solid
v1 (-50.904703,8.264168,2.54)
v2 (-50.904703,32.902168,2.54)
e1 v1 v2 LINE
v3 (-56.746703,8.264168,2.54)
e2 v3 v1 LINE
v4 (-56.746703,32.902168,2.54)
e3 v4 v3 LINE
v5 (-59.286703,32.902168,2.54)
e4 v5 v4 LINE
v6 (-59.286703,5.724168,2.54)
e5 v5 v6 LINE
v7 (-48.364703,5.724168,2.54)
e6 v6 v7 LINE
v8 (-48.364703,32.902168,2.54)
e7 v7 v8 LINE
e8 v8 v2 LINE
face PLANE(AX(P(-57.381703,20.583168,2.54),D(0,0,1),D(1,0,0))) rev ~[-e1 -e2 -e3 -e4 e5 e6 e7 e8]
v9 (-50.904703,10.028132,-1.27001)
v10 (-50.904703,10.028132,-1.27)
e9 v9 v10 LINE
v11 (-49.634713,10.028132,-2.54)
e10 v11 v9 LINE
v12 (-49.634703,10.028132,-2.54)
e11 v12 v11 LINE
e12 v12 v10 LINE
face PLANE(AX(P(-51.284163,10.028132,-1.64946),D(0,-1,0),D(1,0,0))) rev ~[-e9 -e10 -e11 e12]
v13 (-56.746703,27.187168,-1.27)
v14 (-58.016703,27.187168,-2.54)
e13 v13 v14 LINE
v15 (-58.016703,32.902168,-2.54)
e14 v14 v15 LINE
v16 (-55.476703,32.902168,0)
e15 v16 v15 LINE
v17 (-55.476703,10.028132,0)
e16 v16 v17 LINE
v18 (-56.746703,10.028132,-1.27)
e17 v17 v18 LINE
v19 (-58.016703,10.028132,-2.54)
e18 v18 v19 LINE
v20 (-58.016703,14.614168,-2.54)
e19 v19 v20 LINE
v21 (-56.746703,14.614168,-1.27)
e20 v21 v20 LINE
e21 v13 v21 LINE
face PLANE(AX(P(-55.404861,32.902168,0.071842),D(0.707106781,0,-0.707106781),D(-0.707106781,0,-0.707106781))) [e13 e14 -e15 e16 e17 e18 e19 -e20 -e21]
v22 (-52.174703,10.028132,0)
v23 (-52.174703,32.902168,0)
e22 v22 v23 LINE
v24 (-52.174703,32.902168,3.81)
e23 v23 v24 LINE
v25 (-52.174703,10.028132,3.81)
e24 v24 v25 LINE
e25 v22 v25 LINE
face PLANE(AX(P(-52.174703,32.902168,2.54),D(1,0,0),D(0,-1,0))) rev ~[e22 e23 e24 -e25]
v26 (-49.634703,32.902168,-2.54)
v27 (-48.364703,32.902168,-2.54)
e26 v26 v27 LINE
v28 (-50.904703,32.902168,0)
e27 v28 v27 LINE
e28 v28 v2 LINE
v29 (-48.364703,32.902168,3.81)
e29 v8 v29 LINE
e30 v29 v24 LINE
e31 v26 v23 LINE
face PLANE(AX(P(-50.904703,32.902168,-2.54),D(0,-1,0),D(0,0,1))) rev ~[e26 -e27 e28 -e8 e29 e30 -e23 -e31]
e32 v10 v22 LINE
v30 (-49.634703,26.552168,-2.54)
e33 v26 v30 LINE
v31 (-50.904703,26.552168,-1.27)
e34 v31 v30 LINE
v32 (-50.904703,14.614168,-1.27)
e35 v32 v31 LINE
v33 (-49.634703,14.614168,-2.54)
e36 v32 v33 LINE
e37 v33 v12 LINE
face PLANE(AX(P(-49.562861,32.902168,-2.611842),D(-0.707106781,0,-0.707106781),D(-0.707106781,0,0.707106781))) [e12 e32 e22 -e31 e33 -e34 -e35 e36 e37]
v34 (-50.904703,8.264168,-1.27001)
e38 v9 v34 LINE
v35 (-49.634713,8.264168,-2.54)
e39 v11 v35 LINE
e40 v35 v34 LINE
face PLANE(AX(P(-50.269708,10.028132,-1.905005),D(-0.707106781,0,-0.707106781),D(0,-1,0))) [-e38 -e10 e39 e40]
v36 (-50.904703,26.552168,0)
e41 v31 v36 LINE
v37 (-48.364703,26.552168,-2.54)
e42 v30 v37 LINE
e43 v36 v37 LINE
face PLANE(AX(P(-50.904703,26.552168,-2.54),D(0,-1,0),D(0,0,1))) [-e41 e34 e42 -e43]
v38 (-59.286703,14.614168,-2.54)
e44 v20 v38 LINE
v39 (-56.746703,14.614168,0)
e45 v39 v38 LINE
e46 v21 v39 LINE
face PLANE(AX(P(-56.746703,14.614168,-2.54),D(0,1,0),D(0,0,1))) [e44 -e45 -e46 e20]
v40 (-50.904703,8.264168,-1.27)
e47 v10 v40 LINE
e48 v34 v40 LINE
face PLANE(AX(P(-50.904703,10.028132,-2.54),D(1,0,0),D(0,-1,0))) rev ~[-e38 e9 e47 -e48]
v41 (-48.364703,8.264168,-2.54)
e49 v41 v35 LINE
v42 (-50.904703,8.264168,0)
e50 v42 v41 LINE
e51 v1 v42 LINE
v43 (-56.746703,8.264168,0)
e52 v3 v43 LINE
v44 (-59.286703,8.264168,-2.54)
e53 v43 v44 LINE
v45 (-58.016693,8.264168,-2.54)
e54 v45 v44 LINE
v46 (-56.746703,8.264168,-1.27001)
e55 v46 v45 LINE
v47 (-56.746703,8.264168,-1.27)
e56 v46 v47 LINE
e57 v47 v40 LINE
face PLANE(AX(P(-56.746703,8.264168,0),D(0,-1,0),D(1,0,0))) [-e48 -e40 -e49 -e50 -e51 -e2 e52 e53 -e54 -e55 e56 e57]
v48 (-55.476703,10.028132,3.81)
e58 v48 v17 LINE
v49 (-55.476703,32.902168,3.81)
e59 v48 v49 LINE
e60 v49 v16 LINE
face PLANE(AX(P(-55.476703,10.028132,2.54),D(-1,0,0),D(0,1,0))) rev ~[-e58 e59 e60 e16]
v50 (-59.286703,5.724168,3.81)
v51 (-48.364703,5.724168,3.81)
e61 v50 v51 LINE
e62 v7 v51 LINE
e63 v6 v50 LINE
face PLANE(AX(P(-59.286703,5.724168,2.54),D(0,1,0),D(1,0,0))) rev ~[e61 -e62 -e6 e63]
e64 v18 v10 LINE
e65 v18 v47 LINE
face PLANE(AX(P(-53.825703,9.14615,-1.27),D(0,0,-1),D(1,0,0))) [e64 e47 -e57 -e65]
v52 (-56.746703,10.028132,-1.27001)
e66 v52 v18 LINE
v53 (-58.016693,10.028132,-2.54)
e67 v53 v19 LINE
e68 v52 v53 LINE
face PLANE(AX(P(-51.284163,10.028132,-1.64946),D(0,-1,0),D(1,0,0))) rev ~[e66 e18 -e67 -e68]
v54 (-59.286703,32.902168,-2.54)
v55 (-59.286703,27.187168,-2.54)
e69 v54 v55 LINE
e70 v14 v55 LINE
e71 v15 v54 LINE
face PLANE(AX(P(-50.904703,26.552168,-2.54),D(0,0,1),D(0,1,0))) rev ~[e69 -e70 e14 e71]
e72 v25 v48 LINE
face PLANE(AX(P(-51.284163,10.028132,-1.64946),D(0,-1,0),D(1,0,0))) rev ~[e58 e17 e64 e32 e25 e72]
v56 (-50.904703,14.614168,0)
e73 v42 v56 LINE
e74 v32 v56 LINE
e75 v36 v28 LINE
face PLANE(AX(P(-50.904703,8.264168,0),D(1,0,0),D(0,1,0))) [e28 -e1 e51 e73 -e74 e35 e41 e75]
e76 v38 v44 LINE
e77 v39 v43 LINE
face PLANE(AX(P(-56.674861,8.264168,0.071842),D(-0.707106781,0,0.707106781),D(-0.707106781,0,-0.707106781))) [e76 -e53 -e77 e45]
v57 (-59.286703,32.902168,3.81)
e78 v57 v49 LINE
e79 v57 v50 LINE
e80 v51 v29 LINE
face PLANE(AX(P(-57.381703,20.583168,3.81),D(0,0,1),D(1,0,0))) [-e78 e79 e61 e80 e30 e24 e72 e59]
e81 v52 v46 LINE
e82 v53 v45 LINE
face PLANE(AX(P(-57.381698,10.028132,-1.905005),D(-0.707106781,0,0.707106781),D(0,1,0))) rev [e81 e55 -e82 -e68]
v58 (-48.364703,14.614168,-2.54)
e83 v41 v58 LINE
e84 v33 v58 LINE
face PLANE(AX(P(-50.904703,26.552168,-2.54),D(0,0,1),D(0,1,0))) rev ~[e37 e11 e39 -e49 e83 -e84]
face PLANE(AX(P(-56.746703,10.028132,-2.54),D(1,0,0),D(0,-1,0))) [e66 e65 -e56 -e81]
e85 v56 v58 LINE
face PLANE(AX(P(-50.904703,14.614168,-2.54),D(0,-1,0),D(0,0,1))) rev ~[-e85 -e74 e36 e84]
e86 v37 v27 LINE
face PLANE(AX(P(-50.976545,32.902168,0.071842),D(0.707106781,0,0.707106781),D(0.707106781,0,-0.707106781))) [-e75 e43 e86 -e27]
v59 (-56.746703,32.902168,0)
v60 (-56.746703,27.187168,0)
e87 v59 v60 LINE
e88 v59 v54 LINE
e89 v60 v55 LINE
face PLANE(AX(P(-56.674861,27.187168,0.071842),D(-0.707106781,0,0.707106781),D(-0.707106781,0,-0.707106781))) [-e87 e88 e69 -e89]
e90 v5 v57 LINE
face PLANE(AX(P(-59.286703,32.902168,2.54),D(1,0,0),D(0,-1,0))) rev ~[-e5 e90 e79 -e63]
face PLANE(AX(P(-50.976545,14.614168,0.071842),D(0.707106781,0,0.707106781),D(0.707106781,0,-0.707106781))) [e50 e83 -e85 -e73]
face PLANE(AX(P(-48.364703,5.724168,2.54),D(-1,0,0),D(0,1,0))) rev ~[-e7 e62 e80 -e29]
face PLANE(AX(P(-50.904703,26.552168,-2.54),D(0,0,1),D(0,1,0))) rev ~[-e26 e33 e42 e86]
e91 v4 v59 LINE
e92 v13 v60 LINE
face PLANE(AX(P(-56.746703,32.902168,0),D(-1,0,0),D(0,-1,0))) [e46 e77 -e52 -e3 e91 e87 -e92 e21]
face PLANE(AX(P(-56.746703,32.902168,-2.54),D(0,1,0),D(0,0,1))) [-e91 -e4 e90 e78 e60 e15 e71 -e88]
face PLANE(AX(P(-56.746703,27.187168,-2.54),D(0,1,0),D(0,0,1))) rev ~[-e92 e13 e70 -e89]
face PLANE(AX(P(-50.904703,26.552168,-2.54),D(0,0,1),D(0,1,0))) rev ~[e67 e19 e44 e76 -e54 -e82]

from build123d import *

# Parameters (mm, degrees)
F1_DEPTH      = 2.54
F1_DEPTH_BACK = 2.54
F2_W          = 3.81
F2_H          = 24.638
F2_W_2        = 2.54
F3_DEPTH      = 1.27
F4_W          = 5.715
F4_H          = 2.54
F4_W_2        = 6.35
F6_DEPTH      = 2.54
F5_W          = 6.35
F5_H          = 2.54
F7_DEPTH      = 2.54
F8_T1_DEPTH   = 22.8740361466
F8_T6_DEPTH   = 6.35
F8_T11_DEPTH  = 6.35
F8_T16_DEPTH  = 6.35
F8_T21_DEPTH  = 5.715
F9_W          = 5.842
F9_H          = 1.7639638534
F10_DEPTH     = 1.27
F11_SIZE      = 1.26999


# Not quite as in the source:
# - a fillet or chamfer that OpenCascade refuses, or shapes differently, is made with other operations: its cross-section is extruded or revolved along the edge and cut away or added
# - a fillet or chamfer is up to 0.001 mm smaller than in the source, because OpenCascade refuses the exact size


with BuildPart() as f1:
    # F0 (on Top) → F1 (new body, two sides)
    with BuildSketch(Plane.XY) as f1_sk:
        Polygon((-55.4767026412, 32.9021683285), (-56.7467026412, 32.9021683285), (-56.7467026412, 8.2641683285), (-50.9047026412, 8.2641683285), (-50.9047026412, 32.9021683285), (-52.1747026412, 32.9021683285), (-52.1747026412, 10.0281321819), (-55.4767026412, 10.0281321819), align=None)
    extrude(amount=F1_DEPTH)
    extrude(f1_sk.sketch, amount=-F1_DEPTH_BACK)

    # F2 (on face) → F3 (join)
    with BuildSketch(Plane.XY.offset(2.54)):
        with Locations((-57.3817026412, 20.5831683285)):
            Rectangle(F2_W, F2_H)
        Polygon((-50.9047026412, 8.2641683285), (-55.4767026412, 8.2641683285), (-59.2867026412, 8.2641683285), (-59.2867026412, 5.7241683285), (-48.3647026412, 5.7241683285), (-48.3647026412, 8.2641683285), align=None)
        with Locations((-49.6347026412, 20.5831683285)):
            Rectangle(F2_W_2, F2_H)
        Polygon((-52.1747026412, 10.0281321819), (-55.4767026412, 10.0281321819), (-55.4767026412, 8.2641683285), (-50.9047026412, 8.2641683285), (-50.9047026412, 32.9021683285), (-52.1747026412, 32.9021683285), align=None)
    extrude(amount=F3_DEPTH)

    # F4 (on face) → F6 (join)
    with BuildSketch(Plane(origin=(-56.7467026412, 0, 0), x_dir=(0, -1, 0), z_dir=(-1, 0, 0))):
        with Locations((-30.0446683285, -1.27)):
            Rectangle(F4_W, F4_H)
        with Locations((-11.4391683285, -1.27)):
            Rectangle(F4_W_2, F4_H)
    extrude(amount=F6_DEPTH)

    # F5 (on face) → F7 (join)
    with BuildSketch(Plane.YZ.offset(-50.9047026412)):
        with Locations((29.7271683285, -1.27)):
            Rectangle(F5_W, F5_H)
        with Locations((11.4391683285, -1.27)):
            Rectangle(F5_W, F5_H)
    extrude(amount=F7_DEPTH)

    # F8: chamfer of 2.54 on 6 edges, made by hand

    # F8_s2 → F8_t1 (cut)
    with BuildSketch(Plane.XZ.offset(-32.9021683285)):
        with BuildLine():
            Line((-49.5628605923, -2.611842049), (-52.2465446902, 0.071842049))
            Line((-52.2465446902, 0.071842049), (-52.2973446902, 0.071842049))
            ThreePointArc((-52.2973446902, 0.071842049), (-52.2255026412, -1.2340789755), (-52.2255026412, -2.54))
            Line((-52.2255026412, -2.54), (-52.1747026412, -2.5908))
            ThreePointArc((-52.1747026412, -2.5908), (-50.8687816168, -2.5908), (-49.5628605923, -2.662642049))
            Line((-49.5628605923, -2.662642049), (-49.5628605923, -2.611842049))
        make_face()
        with BuildLine():
            Line((-55.4048605923, 0.071842049), (-58.0885446902, -2.611842049))
            Line((-58.0885446902, -2.611842049), (-58.0885446902, -2.662642049))
            ThreePointArc((-58.0885446902, -2.662642049), (-56.7826236657, -2.5908), (-55.4767026412, -2.5908))
            Line((-55.4767026412, -2.5908), (-55.4259026412, -2.54))
            ThreePointArc((-55.4259026412, -2.54), (-55.4259026412, -1.2340789755), (-55.3540605923, 0.071842049))
            Line((-55.3540605923, 0.071842049), (-55.4048605923, 0.071842049))
        make_face()
    extrude(amount=F8_T1_DEPTH, mode=Mode.SUBTRACT)


with BuildPart() as f8_tool4:
    # F8_s5 → F8_t6 (new body)
    with BuildSketch(Plane.XZ.offset(-32.9021683285)):
        with BuildLine():
            Line((-50.9765446902, 0.071842049), (-48.2928605923, -2.611842049))
            Line((-48.2928605923, -2.611842049), (-48.2420605923, -2.611842049))
            ThreePointArc((-48.2420605923, -2.611842049), (-48.3139026412, -1.3059210245), (-48.3139026412, 0))
            Line((-48.3139026412, 0), (-48.3647026412, 0.0508))
            ThreePointArc((-48.3647026412, 0.0508), (-49.6706236657, 0.0508), (-50.9765446902, 0.122642049))
            Line((-50.9765446902, 0.122642049), (-50.9765446902, 0.071842049))
        make_face()
    extrude(amount=F8_T6_DEPTH)

    split(bisect_by=Plane.YZ.offset(-50.9047026412), keep=Keep.TOP)


with BuildPart() as f1_1:
    add(f1.part)

    # F8_t3: cut F8_tool4
    add(f8_tool4.part, mode=Mode.SUBTRACT)


with BuildPart() as f8_tool9:
    # F8_s10 → F8_t11 (new body)
    with BuildSketch(Plane.XZ.offset(-14.6141683285)):
        with BuildLine():
            Line((-50.9765446902, 0.071842049), (-48.2928605923, -2.611842049))
            Line((-48.2928605923, -2.611842049), (-48.2420605923, -2.611842049))
            ThreePointArc((-48.2420605923, -2.611842049), (-48.3139026412, -1.3059210245), (-48.3139026412, 0))
            Line((-48.3139026412, 0), (-48.3647026412, 0.0508))
            ThreePointArc((-48.3647026412, 0.0508), (-49.6706236657, 0.0508), (-50.9765446902, 0.122642049))
            Line((-50.9765446902, 0.122642049), (-50.9765446902, 0.071842049))
        make_face()
    extrude(amount=F8_T11_DEPTH)

    split(bisect_by=Plane.YZ.offset(-50.9047026412), keep=Keep.TOP)


with BuildPart() as f1_2:
    add(f1_1.part)

    # F8_t8: cut F8_tool9
    add(f8_tool9.part, mode=Mode.SUBTRACT)


with BuildPart() as f8_tool14:
    # F8_s15 → F8_t16 (new body)
    with BuildSketch(Plane.XZ.offset(-8.2641683285)):
        with BuildLine():
            Line((-56.6748605923, 0.071842049), (-59.3585446902, -2.611842049))
            Line((-59.3585446902, -2.611842049), (-59.4093446902, -2.611842049))
            ThreePointArc((-59.4093446902, -2.611842049), (-59.3375026412, -1.3059210245), (-59.3375026412, 0))
            Line((-59.3375026412, 0), (-59.2867026412, 0.0508))
            ThreePointArc((-59.2867026412, 0.0508), (-57.9807816168, 0.0508), (-56.6748605923, 0.122642049))
            Line((-56.6748605923, 0.122642049), (-56.6748605923, 0.071842049))
        make_face()
    extrude(amount=-F8_T16_DEPTH)

    split(bisect_by=Plane.YZ.offset(-56.7467026412), keep=Keep.BOTTOM)


with BuildPart() as f1_3:
    add(f1_2.part)

    # F8_t13: cut F8_tool14
    add(f8_tool14.part, mode=Mode.SUBTRACT)


with BuildPart() as f8_tool19:
    # F8_s20 → F8_t21 (new body)
    with BuildSketch(Plane.XZ.offset(-27.1871683285)):
        with BuildLine():
            Line((-56.6748605923, 0.071842049), (-59.3585446902, -2.611842049))
            Line((-59.3585446902, -2.611842049), (-59.4093446902, -2.611842049))
            ThreePointArc((-59.4093446902, -2.611842049), (-59.3375026412, -1.3059210245), (-59.3375026412, 0))
            Line((-59.3375026412, 0), (-59.2867026412, 0.0508))
            ThreePointArc((-59.2867026412, 0.0508), (-57.9807816168, 0.0508), (-56.6748605923, 0.122642049))
            Line((-56.6748605923, 0.122642049), (-56.6748605923, 0.071842049))
        make_face()
    extrude(amount=-F8_T21_DEPTH)

    split(bisect_by=Plane.YZ.offset(-56.7467026412), keep=Keep.BOTTOM)


with BuildPart() as f1_4:
    add(f1_3.part)

    # F8_t18: cut F8_tool19
    add(f8_tool19.part, mode=Mode.SUBTRACT)

    # F9 (on face) → F10 (cut)
    with BuildSketch(Plane(origin=(0, 0, -2.54), x_dir=(1, 0, 0), z_dir=(0, 0, -1))):
        with Locations((-53.8257026412, -9.1461502552)):
            Rectangle(F9_W, F9_H)
    extrude(amount=-F10_DEPTH, mode=Mode.SUBTRACT)

    # F11 (size 1.27 in the source; OpenCascade refuses exactly that, so slightly less here)
    f11_edges = [f1_4.edges().sort_by_distance(p)[0] for p in [
        (-50.904703, 9.14615, -2.54),
        (-56.746703, 9.14615, -2.54),
    ]]
    chamfer(f11_edges, length=F11_SIZE)


solid = f1_4.part
